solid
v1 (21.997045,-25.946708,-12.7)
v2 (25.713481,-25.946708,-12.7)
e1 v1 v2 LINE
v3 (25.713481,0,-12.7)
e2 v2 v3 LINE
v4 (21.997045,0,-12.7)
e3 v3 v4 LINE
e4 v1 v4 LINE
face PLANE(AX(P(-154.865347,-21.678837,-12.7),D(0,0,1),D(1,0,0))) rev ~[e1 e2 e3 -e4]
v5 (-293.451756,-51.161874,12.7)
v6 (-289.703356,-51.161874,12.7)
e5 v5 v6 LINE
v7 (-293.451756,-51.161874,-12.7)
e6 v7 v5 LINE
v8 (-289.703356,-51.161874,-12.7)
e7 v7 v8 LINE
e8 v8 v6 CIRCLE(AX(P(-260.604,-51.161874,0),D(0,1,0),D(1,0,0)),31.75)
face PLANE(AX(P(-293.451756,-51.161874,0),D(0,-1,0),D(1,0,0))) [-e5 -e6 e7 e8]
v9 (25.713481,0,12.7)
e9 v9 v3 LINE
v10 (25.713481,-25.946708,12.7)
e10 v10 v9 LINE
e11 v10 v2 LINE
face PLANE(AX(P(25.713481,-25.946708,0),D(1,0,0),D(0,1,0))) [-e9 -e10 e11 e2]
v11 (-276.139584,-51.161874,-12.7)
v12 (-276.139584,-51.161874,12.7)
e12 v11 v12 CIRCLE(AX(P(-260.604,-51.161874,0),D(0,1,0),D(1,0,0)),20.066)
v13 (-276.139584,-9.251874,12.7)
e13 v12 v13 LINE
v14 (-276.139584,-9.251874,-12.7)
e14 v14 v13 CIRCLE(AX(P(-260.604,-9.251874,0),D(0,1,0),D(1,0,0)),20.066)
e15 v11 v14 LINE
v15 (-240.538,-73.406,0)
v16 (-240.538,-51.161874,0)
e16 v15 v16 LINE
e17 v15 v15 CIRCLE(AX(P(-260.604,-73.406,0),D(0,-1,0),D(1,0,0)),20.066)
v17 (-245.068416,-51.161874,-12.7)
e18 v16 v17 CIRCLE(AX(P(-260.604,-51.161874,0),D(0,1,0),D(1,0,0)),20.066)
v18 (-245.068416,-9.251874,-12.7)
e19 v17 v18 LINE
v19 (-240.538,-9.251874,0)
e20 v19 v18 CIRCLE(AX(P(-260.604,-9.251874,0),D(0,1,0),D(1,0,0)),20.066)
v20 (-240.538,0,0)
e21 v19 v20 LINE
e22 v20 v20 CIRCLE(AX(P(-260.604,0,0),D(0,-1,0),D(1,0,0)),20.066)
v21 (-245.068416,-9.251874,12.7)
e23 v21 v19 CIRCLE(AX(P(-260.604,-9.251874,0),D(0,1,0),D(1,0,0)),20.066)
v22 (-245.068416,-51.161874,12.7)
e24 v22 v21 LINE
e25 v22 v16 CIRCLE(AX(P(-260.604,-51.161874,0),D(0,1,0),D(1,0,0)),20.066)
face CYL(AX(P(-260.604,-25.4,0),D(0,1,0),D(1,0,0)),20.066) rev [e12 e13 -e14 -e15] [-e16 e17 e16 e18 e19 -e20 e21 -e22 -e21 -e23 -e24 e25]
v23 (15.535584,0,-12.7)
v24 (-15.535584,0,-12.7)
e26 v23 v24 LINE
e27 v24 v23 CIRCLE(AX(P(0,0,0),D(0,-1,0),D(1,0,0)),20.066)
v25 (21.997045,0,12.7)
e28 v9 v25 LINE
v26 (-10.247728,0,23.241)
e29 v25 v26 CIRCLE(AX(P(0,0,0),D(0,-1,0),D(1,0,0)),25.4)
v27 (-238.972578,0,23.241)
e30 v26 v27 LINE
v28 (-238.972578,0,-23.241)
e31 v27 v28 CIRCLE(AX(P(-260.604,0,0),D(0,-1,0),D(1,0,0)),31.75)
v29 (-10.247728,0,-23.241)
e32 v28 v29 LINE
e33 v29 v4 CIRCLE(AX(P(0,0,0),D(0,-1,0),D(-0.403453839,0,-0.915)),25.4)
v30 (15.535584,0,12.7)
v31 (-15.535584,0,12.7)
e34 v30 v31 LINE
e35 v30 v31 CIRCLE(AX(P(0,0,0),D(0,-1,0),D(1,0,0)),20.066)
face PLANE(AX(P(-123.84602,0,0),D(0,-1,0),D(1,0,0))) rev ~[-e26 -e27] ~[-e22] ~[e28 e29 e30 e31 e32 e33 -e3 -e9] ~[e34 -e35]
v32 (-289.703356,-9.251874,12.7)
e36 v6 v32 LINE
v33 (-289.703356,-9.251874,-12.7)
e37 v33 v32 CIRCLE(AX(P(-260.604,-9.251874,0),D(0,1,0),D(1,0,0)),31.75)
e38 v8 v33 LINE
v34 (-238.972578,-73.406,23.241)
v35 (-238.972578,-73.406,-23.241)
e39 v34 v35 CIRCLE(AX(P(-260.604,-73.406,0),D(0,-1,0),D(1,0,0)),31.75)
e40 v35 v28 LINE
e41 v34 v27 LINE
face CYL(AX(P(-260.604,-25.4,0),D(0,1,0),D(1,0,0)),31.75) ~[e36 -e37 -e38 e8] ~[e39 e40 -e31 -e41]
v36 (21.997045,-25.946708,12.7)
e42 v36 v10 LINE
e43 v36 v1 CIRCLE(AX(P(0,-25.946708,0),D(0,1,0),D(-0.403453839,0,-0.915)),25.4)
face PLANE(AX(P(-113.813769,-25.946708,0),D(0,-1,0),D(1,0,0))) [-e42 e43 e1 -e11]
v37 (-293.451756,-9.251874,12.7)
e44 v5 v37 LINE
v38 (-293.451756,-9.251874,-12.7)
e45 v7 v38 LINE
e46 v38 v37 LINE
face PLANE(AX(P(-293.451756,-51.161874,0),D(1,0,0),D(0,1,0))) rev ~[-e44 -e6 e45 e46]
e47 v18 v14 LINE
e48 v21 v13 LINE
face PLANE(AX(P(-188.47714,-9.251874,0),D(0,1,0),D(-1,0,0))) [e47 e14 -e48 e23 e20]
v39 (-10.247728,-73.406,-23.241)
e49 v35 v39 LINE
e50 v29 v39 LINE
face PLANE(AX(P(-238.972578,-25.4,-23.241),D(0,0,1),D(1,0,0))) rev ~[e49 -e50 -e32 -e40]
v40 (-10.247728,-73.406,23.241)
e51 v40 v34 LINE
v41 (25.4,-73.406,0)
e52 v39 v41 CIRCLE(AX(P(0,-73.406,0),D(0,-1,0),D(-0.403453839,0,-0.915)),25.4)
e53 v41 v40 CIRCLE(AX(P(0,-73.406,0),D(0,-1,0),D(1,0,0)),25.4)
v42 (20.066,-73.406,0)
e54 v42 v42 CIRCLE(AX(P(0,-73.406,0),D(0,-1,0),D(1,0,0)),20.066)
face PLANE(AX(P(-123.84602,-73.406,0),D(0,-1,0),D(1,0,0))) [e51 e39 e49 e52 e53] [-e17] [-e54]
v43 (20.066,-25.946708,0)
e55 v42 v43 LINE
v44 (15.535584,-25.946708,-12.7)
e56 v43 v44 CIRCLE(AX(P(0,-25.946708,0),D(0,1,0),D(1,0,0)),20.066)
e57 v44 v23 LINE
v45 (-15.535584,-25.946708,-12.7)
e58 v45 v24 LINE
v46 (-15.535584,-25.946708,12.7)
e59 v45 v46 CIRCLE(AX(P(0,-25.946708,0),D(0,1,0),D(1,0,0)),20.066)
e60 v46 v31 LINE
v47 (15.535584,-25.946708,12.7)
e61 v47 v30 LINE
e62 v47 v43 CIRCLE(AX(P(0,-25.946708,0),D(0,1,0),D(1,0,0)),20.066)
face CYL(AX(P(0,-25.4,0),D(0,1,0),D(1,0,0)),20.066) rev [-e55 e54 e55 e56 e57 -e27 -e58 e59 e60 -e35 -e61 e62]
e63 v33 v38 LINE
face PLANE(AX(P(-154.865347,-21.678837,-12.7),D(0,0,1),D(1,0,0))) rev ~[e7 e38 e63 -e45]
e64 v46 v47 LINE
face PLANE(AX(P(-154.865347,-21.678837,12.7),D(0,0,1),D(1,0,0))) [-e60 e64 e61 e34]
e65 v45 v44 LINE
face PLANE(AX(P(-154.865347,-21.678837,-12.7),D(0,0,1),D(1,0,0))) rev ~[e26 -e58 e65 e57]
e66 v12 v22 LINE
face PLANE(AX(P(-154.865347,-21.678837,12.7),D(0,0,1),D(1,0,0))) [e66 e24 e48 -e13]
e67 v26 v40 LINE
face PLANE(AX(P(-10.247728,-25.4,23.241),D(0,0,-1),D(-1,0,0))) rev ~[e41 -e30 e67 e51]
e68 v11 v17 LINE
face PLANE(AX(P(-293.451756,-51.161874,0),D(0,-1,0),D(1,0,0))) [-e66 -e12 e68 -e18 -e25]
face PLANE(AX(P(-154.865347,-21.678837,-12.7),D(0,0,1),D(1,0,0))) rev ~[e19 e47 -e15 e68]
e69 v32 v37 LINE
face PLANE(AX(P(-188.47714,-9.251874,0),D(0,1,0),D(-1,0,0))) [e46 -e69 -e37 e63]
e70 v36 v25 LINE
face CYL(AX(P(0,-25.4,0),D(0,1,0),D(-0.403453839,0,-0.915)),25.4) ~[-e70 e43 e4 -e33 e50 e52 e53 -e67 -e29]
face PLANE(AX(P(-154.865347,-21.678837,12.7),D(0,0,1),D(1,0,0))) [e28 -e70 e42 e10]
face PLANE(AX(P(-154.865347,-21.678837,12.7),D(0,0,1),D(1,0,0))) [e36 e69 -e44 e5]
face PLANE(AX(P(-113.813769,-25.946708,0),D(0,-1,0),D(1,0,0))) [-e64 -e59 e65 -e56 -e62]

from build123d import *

# Parameters (mm, degrees)
F0_R     = 20.066
F1_DEPTH = 25.4
F2_DEPTH = 48.006
F3_W     = 1.0977562389
F3_H     = 41.91
F4_DEPTH = 12.7


with BuildPart() as f1:
    # F0 (on Front) → F1 (new body)
    with BuildSketch(Plane.XZ):
        with BuildLine():
            ThreePointArc((-10.2477275042, -23.241), (-25.4, 0), (-10.2477275042, 23.241))
            Line((-10.2477275042, 23.241), (-238.9725779709, 23.241))
            ThreePointArc((-238.9725779709, 23.241), (-231.493347745, 12.674084791), (-228.854, 0))
            ThreePointArc((-228.854, 0), (-231.493347745, -12.674084791), (-238.9725779709, -23.241))
            Line((-238.9725779709, -23.241), (-10.2477275042, -23.241))
        make_face()
        with BuildLine():
            ThreePointArc((-228.854, 0), (-231.493347745, 12.674084791), (-238.9725779709, 23.241))
            ThreePointArc((-238.9725779709, 23.241), (-292.354, 0), (-238.9725779709, -23.241))
            ThreePointArc((-238.9725779709, -23.241), (-231.493347745, -12.674084791), (-228.854, 0))
        make_face()
        with Locations((-260.604, 0)):
            Circle(F0_R, mode=Mode.SUBTRACT)
        with BuildLine():
            ThreePointArc((-10.2477275042, -23.241), (13.8720532257, -21.2773621322), (25.4, 0))
            ThreePointArc((25.4, 0), (13.8720532257, 21.2773621322), (-10.2477275042, 23.241))
            ThreePointArc((-10.2477275042, 23.241), (-25.4, 0), (-10.2477275042, -23.241))
        make_face()
        Circle(F0_R, mode=Mode.SUBTRACT)
    extrude(amount=F1_DEPTH)

    # F2 (add): a face of the model
    f2_faces = [f1.faces().sort_by_distance(p)[0] for p in [
        (-139.2710743105, -25.4, 0),
    ]]
    extrude(f2_faces, amount=F2_DEPTH)

    # F3 (on Top) → F4 (join, symmetric)
    with BuildSketch(Plane.XY):
        Polygon((-10.2477275042, 0), (-163.8780487135, 0), (-188.47713992, -9.2518740857), (-292.354, -9.2518740857), (-292.354, -51.1618740857), (-180.8564199804, -51.1618740857), (-113.8137692817, -25.9467083128), (-10.2477275042, -25.9467083128), align=None)
        Polygon((25.4, 0), (-10.2477275042, 0), (-10.2477275042, -25.9467083128), (25.713481009, -25.9467083128), (25.713481009, 0), align=None)
        with Locations((-292.9028781195, -30.2068740857)):
            Rectangle(F3_W, F3_H)
    extrude(amount=F4_DEPTH, both=True)


solid = f1.part
